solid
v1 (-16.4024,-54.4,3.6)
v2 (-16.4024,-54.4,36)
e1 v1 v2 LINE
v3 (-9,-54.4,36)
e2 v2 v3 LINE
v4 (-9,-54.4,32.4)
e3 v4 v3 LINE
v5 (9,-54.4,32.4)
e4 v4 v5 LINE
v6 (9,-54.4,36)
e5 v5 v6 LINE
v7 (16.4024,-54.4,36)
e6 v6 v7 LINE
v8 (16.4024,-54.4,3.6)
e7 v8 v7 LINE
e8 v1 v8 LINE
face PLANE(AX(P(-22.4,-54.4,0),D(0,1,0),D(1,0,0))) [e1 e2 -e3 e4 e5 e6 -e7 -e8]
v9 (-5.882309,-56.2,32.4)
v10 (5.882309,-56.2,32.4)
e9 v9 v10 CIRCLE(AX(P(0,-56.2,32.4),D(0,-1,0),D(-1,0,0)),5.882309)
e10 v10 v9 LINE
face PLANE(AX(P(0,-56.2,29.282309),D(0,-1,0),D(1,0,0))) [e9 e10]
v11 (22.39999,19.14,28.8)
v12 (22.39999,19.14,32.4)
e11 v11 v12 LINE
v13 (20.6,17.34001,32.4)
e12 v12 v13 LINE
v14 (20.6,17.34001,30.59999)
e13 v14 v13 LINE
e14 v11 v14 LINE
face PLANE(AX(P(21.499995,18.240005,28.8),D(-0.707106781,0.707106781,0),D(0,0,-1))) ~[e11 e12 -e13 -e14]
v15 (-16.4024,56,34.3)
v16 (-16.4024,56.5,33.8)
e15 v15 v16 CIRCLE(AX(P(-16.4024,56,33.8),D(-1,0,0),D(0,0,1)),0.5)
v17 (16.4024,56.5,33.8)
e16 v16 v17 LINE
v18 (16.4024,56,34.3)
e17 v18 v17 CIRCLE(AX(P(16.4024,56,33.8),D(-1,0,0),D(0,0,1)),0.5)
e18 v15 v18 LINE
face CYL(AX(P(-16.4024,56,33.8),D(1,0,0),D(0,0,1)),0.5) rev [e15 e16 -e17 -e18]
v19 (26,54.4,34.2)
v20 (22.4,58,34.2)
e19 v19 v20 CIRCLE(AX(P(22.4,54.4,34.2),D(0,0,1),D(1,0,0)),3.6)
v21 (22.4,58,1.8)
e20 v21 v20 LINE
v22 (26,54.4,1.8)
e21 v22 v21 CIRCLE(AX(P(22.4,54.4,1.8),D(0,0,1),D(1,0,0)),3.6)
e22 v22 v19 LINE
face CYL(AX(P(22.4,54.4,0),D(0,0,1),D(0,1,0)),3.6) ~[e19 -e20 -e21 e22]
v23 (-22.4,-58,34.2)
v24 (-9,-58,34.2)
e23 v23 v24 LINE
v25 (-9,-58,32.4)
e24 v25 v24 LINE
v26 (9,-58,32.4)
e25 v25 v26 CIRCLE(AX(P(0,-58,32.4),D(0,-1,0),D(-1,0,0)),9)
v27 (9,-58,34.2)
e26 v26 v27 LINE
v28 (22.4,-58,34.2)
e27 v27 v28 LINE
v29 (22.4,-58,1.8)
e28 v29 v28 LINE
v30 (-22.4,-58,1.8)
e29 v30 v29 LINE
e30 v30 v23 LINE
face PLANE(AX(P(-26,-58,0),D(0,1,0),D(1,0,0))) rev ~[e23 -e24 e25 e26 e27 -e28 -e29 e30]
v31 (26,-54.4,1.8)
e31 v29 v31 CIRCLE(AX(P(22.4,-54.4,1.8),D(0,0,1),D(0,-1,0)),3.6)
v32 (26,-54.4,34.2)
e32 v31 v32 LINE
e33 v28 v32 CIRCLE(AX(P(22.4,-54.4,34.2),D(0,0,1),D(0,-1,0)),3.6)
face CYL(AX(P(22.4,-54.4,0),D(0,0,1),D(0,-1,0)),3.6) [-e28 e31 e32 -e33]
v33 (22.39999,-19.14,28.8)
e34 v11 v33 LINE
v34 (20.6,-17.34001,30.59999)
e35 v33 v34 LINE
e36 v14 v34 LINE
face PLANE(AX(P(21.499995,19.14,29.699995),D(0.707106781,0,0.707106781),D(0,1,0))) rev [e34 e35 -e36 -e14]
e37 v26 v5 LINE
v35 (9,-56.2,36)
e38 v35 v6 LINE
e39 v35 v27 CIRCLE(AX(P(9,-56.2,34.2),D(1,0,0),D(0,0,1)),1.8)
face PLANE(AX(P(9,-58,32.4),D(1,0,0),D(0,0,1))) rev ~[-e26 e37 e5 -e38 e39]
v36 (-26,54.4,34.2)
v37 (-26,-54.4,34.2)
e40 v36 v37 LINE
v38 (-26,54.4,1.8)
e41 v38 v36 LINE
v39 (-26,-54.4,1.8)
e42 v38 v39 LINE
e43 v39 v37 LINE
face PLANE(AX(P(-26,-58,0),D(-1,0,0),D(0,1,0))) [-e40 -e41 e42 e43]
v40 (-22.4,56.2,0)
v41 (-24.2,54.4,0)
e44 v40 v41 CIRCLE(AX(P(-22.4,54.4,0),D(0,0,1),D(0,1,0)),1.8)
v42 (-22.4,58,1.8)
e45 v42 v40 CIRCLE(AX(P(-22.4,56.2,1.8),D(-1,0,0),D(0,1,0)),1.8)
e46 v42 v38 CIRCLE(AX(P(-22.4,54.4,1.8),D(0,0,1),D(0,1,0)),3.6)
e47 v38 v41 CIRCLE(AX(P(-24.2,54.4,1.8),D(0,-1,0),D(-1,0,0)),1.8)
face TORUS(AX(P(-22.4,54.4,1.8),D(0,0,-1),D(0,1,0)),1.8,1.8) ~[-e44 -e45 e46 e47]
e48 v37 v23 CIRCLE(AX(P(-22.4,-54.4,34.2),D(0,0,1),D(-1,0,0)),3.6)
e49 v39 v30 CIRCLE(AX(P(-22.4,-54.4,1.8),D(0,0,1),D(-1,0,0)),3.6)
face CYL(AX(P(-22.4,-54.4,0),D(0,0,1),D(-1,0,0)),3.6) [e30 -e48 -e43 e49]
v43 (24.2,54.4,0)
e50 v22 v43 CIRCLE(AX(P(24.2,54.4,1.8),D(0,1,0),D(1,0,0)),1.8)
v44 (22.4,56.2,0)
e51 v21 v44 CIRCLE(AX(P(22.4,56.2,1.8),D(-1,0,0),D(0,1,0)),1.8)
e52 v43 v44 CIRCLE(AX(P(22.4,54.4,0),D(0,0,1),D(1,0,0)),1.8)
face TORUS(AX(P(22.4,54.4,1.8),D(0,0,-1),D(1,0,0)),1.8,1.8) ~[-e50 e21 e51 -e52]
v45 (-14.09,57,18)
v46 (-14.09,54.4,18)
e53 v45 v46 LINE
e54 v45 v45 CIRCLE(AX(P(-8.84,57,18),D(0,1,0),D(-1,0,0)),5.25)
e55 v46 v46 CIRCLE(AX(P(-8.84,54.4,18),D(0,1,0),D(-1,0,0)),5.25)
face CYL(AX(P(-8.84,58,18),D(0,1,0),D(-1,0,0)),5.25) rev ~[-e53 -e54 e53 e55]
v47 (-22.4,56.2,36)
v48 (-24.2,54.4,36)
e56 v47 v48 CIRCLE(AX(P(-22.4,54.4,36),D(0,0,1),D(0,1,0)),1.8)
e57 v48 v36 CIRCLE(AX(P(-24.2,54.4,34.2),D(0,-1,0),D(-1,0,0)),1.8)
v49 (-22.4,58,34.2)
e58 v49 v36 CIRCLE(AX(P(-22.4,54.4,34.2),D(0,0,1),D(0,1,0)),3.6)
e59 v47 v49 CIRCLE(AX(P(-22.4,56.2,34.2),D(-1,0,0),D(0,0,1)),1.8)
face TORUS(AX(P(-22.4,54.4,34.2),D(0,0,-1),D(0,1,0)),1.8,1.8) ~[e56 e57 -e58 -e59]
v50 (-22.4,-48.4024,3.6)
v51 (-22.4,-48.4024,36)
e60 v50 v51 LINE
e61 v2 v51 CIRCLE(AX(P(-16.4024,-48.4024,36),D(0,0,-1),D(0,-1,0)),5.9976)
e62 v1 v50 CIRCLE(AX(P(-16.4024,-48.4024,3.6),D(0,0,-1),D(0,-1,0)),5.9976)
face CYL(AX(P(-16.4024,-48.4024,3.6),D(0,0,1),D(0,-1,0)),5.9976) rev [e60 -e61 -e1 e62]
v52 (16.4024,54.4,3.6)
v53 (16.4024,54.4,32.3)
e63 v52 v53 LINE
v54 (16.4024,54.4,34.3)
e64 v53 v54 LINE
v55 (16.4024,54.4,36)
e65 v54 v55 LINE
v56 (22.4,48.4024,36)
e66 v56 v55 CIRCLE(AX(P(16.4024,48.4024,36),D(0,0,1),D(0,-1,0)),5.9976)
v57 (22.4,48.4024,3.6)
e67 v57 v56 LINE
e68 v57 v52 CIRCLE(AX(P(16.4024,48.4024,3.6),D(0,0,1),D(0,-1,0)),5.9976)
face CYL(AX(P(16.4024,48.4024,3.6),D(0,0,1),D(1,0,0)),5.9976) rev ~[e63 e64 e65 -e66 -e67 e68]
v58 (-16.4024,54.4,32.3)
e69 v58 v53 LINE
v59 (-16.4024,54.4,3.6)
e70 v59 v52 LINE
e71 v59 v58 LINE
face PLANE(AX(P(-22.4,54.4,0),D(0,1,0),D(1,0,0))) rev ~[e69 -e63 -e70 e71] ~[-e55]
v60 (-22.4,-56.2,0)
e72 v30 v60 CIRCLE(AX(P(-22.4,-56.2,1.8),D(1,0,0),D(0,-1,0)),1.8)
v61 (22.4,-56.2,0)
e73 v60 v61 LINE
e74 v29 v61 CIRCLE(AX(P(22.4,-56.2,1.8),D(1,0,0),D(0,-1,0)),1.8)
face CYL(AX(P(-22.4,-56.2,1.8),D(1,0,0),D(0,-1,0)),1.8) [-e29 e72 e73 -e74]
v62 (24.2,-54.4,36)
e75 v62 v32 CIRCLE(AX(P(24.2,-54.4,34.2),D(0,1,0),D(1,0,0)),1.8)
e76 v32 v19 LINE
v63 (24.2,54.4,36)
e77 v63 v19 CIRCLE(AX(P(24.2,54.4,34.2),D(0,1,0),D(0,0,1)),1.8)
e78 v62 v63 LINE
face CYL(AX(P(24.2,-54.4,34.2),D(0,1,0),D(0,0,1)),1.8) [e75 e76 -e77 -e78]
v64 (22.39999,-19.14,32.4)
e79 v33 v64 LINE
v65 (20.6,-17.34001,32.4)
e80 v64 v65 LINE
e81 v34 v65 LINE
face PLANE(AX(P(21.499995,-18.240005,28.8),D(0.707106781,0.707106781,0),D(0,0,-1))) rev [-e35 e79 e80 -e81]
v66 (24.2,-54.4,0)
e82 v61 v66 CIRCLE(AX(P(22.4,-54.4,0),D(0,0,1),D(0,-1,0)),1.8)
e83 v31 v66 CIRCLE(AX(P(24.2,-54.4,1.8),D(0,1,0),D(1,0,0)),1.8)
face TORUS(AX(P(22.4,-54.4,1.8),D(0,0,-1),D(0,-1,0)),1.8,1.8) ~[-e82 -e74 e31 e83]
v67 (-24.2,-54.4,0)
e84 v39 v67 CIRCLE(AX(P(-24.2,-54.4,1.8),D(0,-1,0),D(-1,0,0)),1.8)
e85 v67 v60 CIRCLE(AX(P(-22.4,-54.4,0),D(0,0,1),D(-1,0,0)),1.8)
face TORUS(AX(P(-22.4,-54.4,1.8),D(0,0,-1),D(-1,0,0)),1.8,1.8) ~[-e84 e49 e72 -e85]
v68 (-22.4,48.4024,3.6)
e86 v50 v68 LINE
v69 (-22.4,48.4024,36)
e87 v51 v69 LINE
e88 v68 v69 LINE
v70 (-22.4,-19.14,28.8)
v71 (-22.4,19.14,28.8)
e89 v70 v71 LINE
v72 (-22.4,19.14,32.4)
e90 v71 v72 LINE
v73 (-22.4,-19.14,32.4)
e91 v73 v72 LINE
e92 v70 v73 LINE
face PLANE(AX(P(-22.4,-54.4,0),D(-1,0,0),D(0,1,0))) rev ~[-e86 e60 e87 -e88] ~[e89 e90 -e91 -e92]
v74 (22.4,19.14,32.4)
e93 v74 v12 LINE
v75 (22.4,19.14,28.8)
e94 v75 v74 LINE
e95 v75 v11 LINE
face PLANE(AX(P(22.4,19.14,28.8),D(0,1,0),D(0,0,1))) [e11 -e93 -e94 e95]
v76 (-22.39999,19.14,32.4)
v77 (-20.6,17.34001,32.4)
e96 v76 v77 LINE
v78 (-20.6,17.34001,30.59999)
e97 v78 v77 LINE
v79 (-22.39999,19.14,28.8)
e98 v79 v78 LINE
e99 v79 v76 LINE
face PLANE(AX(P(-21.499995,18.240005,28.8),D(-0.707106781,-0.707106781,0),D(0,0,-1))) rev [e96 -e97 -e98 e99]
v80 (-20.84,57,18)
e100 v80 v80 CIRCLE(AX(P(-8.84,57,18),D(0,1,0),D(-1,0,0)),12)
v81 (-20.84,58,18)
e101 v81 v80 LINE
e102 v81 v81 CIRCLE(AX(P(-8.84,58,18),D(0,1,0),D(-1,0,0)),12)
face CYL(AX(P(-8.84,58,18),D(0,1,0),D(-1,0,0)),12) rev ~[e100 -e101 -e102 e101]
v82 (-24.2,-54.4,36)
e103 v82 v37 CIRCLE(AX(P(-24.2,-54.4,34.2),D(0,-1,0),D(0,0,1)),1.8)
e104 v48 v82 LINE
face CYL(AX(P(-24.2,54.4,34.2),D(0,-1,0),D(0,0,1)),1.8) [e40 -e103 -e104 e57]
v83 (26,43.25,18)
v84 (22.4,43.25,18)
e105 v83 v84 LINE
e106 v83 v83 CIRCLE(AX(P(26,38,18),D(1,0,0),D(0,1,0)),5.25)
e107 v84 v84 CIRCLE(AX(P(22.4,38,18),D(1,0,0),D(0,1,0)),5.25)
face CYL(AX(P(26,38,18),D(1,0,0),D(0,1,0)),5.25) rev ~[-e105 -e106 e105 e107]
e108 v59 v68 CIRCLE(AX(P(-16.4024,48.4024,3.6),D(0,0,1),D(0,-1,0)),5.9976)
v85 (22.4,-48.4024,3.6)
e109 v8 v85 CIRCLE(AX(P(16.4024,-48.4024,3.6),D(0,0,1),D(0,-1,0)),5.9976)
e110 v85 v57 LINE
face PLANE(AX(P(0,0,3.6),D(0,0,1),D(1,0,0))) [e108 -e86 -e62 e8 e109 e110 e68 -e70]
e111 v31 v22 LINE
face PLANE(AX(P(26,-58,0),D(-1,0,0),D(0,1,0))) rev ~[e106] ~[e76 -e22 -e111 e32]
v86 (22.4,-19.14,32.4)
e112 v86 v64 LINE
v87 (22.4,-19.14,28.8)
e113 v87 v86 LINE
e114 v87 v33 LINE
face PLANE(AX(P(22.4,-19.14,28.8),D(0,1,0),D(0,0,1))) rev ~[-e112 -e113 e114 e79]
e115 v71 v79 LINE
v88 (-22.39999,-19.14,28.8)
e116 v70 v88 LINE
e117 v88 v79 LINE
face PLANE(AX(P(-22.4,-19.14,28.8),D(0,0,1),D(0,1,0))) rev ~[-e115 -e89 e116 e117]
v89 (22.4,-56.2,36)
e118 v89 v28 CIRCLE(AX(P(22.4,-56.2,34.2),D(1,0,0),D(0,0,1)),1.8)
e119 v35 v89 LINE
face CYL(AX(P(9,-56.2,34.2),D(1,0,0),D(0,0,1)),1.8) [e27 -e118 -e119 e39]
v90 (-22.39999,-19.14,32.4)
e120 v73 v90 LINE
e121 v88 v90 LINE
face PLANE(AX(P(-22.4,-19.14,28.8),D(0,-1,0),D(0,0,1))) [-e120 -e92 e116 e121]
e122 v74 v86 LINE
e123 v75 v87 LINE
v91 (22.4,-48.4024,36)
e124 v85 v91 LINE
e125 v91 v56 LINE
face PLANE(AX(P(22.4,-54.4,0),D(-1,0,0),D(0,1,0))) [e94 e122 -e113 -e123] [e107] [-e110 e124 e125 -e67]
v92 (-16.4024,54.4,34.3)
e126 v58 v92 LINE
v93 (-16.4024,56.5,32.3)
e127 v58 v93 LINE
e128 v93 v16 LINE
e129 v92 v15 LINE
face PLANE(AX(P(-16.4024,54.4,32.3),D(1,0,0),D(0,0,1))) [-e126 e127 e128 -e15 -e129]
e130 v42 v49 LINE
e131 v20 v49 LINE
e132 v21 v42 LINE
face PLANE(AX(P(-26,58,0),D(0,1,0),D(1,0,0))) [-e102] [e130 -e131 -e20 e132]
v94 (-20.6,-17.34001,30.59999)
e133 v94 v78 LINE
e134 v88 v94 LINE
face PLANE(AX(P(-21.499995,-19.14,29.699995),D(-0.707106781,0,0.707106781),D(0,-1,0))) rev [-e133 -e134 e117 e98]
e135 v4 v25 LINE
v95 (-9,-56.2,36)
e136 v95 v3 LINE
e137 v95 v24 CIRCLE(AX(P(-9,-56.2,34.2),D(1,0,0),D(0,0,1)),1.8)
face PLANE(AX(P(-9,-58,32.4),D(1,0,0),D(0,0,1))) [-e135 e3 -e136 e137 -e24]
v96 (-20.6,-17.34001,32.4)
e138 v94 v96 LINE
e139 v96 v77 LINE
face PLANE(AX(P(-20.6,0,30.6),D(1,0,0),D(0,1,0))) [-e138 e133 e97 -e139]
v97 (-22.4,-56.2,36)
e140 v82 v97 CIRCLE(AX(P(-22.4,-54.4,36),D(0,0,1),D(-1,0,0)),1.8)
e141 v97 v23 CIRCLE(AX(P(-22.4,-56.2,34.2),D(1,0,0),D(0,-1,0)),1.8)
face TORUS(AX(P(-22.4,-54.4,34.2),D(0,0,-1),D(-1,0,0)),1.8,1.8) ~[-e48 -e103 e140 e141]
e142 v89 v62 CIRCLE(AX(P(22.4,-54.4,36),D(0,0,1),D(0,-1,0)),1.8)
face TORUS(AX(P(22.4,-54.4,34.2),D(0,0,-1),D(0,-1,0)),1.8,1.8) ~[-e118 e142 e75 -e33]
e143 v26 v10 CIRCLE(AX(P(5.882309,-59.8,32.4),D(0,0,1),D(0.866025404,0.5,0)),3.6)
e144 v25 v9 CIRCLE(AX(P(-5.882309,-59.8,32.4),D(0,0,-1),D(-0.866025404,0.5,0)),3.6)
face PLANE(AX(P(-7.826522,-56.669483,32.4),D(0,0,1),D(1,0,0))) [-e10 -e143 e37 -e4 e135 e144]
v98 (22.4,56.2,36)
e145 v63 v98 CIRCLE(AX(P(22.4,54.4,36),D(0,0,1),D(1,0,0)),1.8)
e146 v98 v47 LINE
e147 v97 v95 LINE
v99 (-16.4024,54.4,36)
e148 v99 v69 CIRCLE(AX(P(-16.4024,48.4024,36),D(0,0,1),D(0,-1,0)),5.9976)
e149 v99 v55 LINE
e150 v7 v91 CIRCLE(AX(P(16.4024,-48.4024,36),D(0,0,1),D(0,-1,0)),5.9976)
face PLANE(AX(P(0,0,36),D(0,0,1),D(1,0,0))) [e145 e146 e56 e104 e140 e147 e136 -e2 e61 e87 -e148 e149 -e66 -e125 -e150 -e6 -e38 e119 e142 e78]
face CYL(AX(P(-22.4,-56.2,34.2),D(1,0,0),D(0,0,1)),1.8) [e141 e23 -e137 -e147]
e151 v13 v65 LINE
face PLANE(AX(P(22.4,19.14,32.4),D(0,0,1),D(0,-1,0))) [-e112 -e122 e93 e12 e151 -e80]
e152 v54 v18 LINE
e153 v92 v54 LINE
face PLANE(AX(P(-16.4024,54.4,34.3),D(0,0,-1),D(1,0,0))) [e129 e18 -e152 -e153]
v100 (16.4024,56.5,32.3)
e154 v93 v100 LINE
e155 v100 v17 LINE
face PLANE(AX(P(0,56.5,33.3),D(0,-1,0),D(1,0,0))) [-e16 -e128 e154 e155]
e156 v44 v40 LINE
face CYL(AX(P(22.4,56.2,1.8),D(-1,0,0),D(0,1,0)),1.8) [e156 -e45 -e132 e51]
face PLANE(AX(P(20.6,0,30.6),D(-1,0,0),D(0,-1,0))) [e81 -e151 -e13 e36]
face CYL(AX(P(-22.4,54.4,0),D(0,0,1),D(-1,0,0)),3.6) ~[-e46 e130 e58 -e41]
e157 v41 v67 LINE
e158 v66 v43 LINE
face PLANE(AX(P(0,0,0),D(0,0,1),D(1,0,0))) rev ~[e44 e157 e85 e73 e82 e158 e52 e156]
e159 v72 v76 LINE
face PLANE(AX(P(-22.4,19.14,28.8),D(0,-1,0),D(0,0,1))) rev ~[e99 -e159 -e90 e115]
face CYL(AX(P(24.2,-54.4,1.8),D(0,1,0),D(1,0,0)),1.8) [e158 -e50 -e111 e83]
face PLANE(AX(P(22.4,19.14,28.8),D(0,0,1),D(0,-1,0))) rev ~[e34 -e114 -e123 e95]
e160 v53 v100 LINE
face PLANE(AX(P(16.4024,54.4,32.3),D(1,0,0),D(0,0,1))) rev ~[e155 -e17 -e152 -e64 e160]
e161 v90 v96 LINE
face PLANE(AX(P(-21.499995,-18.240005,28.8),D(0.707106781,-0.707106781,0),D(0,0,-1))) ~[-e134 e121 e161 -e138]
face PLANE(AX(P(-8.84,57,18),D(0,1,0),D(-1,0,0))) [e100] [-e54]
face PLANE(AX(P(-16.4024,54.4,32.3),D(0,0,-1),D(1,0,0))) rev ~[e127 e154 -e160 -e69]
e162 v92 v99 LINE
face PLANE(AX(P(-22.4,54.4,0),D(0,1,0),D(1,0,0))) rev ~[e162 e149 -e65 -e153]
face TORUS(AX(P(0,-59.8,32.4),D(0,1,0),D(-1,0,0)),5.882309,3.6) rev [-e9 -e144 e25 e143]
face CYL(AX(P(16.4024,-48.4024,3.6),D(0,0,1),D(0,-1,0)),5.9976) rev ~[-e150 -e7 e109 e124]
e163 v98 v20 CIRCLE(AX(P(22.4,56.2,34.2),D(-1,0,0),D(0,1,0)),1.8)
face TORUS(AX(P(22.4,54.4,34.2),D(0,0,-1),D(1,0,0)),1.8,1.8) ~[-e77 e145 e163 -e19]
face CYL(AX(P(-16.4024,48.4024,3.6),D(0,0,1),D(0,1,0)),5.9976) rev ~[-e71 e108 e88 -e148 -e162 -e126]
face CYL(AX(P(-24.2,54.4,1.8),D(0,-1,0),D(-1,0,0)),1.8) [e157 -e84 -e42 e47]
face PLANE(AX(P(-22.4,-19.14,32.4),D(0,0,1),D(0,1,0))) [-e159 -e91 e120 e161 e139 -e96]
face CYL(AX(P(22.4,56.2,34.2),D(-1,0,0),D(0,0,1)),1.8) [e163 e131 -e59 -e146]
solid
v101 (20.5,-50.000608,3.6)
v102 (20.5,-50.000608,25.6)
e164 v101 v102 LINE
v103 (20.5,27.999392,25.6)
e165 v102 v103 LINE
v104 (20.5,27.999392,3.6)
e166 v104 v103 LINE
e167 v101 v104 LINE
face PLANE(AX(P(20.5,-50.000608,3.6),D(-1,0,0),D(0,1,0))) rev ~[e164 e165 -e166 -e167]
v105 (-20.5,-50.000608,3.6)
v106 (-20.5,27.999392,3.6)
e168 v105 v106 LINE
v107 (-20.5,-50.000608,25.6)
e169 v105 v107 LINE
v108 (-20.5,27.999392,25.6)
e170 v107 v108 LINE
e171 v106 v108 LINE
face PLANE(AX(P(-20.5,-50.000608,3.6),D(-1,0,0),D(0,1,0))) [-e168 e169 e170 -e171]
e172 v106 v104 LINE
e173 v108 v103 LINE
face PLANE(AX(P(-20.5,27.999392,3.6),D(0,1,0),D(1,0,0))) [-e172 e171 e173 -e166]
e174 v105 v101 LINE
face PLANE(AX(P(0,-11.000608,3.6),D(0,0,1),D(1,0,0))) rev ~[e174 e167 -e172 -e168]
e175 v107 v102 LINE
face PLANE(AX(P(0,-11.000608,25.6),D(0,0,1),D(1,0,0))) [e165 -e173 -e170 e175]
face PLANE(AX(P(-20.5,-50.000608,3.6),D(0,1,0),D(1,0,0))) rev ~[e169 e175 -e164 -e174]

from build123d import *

# Parameters (mm, degrees)
F2_W         = 52
F2_H         = 116
F2_W_2       = 44.8
F2_H_2       = 108.8
F3_DEPTH     = 36
F4_DEPTH     = 3.6
F7_R         = 3.6
F8_R         = 5.9976
F6_R         = 5.25
F9_DEPTH     = 3.6
F5_R         = 5.25
F10_DEPTH    = 3.6
F11_W        = 18
F11_H        = 3.6
F12_DEPTH    = 3.6
F13_W        = 32.8048
F13_H        = 2
F14_DEPTH    = 2.1
F15_R        = 1.8
F6_R_2       = 12
F17_DEPTH    = 1
F18_R        = 0.5
F19_W        = 38.28
F19_H        = 3.6
F21_DEPTH    = 1.8
F20_W        = 38.28
F20_H        = 3.6
F22_DEPTH    = 1.8
F23_SIZE     = 1.79999
F25_DEPTH    = 1.8
F26_T2_ANGLE = 180
F27_W        = 41
F27_H        = 78
F28_DEPTH    = 22


# Not quite as in the source:
# - a fillet or chamfer that OpenCascade refuses, or shapes differently, is made with other operations: its cross-section is extruded or revolved along the edge and cut away or added
# - a fillet or chamfer is up to 0.001 mm smaller than in the source, because OpenCascade refuses the exact size
# - a feature of the source that left no trace in its solid (it failed there, or was rolled back) is left out


with BuildPart() as f3:
    # F2 (on Top) → F3 (new body)
    with BuildSketch(Plane.XY):
        Rectangle(F2_W, F2_H)
        Rectangle(F2_W_2, F2_H_2, mode=Mode.SUBTRACT)
    extrude(amount=F3_DEPTH)

    # F2 (on Top) → F4 (join)
    with BuildSketch(Plane.XY):
        Rectangle(F2_W_2, F2_H_2)
    extrude(amount=F4_DEPTH)

    # F7
    f7_edges = [f3.edges().sort_by_distance(p)[0] for p in [
        (26, 58, 18),
        (-26, 58, 18),
        (-26, -58, 18),
        (26, -58, 18),
    ]]
    fillet(f7_edges, radius=F7_R)

    # F8
    f8_edges = [f3.edges().sort_by_distance(p)[0] for p in [
        (-22.4, -54.4, 19.8),
        (22.4, -54.4, 19.8),
        (22.4, 54.4, 19.8),
        (-22.4, 54.4, 19.8),
    ]]
    fillet(f8_edges, radius=F8_R)

    # F6 (on face) → F9 (cut)
    with BuildSketch(Plane(origin=(0, 58, 0), x_dir=(-1, 0, 0), z_dir=(0, 1, 0))):
        with Locations((8.84, 18)):
            Circle(F6_R)
    extrude(amount=-F9_DEPTH, mode=Mode.SUBTRACT)

    # F5 (on face) → F10 (cut)
    with BuildSketch(Plane.YZ.offset(26)):
        with Locations((38, 18)):
            Circle(F5_R)
    extrude(amount=-F10_DEPTH, mode=Mode.SUBTRACT)

    # F11 (on face) → F12 (cut)
    with BuildSketch(Plane.XZ.offset(58)):
        with Locations((0, 34.2)):
            Rectangle(F11_W, F11_H)
    extrude(amount=-F12_DEPTH, mode=Mode.SUBTRACT)

    # F13 (on face) → F14 (cut)
    with BuildSketch(Plane.XZ.offset(-54.4)):
        with Locations((0, 33.3)):
            Rectangle(F13_W, F13_H)
    extrude(amount=-F14_DEPTH, mode=Mode.SUBTRACT)

    # F15
    f15_edges = [f3.edges().sort_by_distance(p)[0] for p in [
        (15.7, -58, 36),
        (24.945584, -56.945584, 36),
        (26, 0, 36),
        (-15.7, -58, 36),
        (-24.945584, -56.945584, 36),
        (-26, 0, 36),
        (-24.945584, 56.945584, 36),
        (0, 58, 36),
        (24.945584, 56.945584, 36),
        (0, -58, 0),
        (-24.945584, -56.945584, 0),
        (-26, 0, 0),
        (-24.945584, 56.945584, 0),
        (0, 58, 0),
        (24.945584, 56.945584, 0),
        (26, 0, 0),
        (24.945584, -56.945584, 0),
    ]]
    fillet(f15_edges, radius=F15_R)

    # F6 (on face) → F17 (cut)
    with BuildSketch(Plane(origin=(0, 58, 0), x_dir=(-1, 0, 0), z_dir=(0, 1, 0))):
        with Locations((8.84, 18)):
            Circle(F6_R_2)
        with Locations((8.84, 18)):
            Circle(F6_R, mode=Mode.SUBTRACT)
    extrude(amount=-F17_DEPTH, mode=Mode.SUBTRACT)

    # F18
    f18_edges = [f3.edges().sort_by_distance(p)[0] for p in [
        (0, 56.5, 34.3),
    ]]
    fillet(f18_edges, radius=F18_R)

    # F19 (on face) → F21 (join)
    with BuildSketch(Plane(origin=(22.4, 0, 0), x_dir=(0, -1, 0), z_dir=(-1, 0, 0))):
        with Locations((0, 30.6)):
            Rectangle(F19_W, F19_H)
    extrude(amount=F21_DEPTH)

    # F20 (on face) → F22 (join)
    with BuildSketch(Plane.YZ.offset(-22.4)):
        with Locations((0, 30.6)):
            Rectangle(F20_W, F20_H)
    extrude(amount=F22_DEPTH)

    # F23 (size 1.8 in the source; OpenCascade refuses exactly that, so slightly less here)
    f23_edges = [f3.edges().sort_by_distance(p)[0] for p in [
        (-20.6, -19.14, 30.6),
        (-20.6, 0, 28.8),
        (-20.6, 19.14, 30.6),
        (20.6, 19.14, 30.6),
        (20.6, 0, 28.8),
        (20.6, -19.14, 30.6),
    ]]
    chamfer(f23_edges, length=F23_SIZE)

    # F11 (on face) → F25 (cut)
    with BuildSketch(Plane.XZ.offset(58)):
        with BuildLine():
            ThreePointArc((-9, 32.4), (0, 23.4), (9, 32.4))
            Line((9, 32.4), (-9, 32.4))
        make_face()
    extrude(amount=-F25_DEPTH, mode=Mode.SUBTRACT)

    # F26: fillet of radius 3.6 on 1 edges, made by hand

    # F26_s1 → F26_t2 (revolve)
    with BuildSketch(Plane.XY.offset(32.4)):
        with BuildLine():
            ThreePointArc((-9, -58), (-7.6823085464, -56.6823085464), (-5.8823085464, -56.2))
            Line((-5.8823085464, -56.2), (-9, -56.2))
            Line((-9, -56.2), (-9, -58))
        make_face()
    revolve(axis=Axis((0, -56.2, 32.4), (0, -1, 0)), revolution_arc=F26_T2_ANGLE)


with BuildPart() as f28:
    # F27 (on face) → F28 (new body)
    with BuildSketch(Plane.XY.offset(3.6)):
        with Locations((0, -11.0006080357)):
            Rectangle(F27_W, F27_H)
    extrude(amount=F28_DEPTH)


solid = Compound([f3.part, f28.part])
